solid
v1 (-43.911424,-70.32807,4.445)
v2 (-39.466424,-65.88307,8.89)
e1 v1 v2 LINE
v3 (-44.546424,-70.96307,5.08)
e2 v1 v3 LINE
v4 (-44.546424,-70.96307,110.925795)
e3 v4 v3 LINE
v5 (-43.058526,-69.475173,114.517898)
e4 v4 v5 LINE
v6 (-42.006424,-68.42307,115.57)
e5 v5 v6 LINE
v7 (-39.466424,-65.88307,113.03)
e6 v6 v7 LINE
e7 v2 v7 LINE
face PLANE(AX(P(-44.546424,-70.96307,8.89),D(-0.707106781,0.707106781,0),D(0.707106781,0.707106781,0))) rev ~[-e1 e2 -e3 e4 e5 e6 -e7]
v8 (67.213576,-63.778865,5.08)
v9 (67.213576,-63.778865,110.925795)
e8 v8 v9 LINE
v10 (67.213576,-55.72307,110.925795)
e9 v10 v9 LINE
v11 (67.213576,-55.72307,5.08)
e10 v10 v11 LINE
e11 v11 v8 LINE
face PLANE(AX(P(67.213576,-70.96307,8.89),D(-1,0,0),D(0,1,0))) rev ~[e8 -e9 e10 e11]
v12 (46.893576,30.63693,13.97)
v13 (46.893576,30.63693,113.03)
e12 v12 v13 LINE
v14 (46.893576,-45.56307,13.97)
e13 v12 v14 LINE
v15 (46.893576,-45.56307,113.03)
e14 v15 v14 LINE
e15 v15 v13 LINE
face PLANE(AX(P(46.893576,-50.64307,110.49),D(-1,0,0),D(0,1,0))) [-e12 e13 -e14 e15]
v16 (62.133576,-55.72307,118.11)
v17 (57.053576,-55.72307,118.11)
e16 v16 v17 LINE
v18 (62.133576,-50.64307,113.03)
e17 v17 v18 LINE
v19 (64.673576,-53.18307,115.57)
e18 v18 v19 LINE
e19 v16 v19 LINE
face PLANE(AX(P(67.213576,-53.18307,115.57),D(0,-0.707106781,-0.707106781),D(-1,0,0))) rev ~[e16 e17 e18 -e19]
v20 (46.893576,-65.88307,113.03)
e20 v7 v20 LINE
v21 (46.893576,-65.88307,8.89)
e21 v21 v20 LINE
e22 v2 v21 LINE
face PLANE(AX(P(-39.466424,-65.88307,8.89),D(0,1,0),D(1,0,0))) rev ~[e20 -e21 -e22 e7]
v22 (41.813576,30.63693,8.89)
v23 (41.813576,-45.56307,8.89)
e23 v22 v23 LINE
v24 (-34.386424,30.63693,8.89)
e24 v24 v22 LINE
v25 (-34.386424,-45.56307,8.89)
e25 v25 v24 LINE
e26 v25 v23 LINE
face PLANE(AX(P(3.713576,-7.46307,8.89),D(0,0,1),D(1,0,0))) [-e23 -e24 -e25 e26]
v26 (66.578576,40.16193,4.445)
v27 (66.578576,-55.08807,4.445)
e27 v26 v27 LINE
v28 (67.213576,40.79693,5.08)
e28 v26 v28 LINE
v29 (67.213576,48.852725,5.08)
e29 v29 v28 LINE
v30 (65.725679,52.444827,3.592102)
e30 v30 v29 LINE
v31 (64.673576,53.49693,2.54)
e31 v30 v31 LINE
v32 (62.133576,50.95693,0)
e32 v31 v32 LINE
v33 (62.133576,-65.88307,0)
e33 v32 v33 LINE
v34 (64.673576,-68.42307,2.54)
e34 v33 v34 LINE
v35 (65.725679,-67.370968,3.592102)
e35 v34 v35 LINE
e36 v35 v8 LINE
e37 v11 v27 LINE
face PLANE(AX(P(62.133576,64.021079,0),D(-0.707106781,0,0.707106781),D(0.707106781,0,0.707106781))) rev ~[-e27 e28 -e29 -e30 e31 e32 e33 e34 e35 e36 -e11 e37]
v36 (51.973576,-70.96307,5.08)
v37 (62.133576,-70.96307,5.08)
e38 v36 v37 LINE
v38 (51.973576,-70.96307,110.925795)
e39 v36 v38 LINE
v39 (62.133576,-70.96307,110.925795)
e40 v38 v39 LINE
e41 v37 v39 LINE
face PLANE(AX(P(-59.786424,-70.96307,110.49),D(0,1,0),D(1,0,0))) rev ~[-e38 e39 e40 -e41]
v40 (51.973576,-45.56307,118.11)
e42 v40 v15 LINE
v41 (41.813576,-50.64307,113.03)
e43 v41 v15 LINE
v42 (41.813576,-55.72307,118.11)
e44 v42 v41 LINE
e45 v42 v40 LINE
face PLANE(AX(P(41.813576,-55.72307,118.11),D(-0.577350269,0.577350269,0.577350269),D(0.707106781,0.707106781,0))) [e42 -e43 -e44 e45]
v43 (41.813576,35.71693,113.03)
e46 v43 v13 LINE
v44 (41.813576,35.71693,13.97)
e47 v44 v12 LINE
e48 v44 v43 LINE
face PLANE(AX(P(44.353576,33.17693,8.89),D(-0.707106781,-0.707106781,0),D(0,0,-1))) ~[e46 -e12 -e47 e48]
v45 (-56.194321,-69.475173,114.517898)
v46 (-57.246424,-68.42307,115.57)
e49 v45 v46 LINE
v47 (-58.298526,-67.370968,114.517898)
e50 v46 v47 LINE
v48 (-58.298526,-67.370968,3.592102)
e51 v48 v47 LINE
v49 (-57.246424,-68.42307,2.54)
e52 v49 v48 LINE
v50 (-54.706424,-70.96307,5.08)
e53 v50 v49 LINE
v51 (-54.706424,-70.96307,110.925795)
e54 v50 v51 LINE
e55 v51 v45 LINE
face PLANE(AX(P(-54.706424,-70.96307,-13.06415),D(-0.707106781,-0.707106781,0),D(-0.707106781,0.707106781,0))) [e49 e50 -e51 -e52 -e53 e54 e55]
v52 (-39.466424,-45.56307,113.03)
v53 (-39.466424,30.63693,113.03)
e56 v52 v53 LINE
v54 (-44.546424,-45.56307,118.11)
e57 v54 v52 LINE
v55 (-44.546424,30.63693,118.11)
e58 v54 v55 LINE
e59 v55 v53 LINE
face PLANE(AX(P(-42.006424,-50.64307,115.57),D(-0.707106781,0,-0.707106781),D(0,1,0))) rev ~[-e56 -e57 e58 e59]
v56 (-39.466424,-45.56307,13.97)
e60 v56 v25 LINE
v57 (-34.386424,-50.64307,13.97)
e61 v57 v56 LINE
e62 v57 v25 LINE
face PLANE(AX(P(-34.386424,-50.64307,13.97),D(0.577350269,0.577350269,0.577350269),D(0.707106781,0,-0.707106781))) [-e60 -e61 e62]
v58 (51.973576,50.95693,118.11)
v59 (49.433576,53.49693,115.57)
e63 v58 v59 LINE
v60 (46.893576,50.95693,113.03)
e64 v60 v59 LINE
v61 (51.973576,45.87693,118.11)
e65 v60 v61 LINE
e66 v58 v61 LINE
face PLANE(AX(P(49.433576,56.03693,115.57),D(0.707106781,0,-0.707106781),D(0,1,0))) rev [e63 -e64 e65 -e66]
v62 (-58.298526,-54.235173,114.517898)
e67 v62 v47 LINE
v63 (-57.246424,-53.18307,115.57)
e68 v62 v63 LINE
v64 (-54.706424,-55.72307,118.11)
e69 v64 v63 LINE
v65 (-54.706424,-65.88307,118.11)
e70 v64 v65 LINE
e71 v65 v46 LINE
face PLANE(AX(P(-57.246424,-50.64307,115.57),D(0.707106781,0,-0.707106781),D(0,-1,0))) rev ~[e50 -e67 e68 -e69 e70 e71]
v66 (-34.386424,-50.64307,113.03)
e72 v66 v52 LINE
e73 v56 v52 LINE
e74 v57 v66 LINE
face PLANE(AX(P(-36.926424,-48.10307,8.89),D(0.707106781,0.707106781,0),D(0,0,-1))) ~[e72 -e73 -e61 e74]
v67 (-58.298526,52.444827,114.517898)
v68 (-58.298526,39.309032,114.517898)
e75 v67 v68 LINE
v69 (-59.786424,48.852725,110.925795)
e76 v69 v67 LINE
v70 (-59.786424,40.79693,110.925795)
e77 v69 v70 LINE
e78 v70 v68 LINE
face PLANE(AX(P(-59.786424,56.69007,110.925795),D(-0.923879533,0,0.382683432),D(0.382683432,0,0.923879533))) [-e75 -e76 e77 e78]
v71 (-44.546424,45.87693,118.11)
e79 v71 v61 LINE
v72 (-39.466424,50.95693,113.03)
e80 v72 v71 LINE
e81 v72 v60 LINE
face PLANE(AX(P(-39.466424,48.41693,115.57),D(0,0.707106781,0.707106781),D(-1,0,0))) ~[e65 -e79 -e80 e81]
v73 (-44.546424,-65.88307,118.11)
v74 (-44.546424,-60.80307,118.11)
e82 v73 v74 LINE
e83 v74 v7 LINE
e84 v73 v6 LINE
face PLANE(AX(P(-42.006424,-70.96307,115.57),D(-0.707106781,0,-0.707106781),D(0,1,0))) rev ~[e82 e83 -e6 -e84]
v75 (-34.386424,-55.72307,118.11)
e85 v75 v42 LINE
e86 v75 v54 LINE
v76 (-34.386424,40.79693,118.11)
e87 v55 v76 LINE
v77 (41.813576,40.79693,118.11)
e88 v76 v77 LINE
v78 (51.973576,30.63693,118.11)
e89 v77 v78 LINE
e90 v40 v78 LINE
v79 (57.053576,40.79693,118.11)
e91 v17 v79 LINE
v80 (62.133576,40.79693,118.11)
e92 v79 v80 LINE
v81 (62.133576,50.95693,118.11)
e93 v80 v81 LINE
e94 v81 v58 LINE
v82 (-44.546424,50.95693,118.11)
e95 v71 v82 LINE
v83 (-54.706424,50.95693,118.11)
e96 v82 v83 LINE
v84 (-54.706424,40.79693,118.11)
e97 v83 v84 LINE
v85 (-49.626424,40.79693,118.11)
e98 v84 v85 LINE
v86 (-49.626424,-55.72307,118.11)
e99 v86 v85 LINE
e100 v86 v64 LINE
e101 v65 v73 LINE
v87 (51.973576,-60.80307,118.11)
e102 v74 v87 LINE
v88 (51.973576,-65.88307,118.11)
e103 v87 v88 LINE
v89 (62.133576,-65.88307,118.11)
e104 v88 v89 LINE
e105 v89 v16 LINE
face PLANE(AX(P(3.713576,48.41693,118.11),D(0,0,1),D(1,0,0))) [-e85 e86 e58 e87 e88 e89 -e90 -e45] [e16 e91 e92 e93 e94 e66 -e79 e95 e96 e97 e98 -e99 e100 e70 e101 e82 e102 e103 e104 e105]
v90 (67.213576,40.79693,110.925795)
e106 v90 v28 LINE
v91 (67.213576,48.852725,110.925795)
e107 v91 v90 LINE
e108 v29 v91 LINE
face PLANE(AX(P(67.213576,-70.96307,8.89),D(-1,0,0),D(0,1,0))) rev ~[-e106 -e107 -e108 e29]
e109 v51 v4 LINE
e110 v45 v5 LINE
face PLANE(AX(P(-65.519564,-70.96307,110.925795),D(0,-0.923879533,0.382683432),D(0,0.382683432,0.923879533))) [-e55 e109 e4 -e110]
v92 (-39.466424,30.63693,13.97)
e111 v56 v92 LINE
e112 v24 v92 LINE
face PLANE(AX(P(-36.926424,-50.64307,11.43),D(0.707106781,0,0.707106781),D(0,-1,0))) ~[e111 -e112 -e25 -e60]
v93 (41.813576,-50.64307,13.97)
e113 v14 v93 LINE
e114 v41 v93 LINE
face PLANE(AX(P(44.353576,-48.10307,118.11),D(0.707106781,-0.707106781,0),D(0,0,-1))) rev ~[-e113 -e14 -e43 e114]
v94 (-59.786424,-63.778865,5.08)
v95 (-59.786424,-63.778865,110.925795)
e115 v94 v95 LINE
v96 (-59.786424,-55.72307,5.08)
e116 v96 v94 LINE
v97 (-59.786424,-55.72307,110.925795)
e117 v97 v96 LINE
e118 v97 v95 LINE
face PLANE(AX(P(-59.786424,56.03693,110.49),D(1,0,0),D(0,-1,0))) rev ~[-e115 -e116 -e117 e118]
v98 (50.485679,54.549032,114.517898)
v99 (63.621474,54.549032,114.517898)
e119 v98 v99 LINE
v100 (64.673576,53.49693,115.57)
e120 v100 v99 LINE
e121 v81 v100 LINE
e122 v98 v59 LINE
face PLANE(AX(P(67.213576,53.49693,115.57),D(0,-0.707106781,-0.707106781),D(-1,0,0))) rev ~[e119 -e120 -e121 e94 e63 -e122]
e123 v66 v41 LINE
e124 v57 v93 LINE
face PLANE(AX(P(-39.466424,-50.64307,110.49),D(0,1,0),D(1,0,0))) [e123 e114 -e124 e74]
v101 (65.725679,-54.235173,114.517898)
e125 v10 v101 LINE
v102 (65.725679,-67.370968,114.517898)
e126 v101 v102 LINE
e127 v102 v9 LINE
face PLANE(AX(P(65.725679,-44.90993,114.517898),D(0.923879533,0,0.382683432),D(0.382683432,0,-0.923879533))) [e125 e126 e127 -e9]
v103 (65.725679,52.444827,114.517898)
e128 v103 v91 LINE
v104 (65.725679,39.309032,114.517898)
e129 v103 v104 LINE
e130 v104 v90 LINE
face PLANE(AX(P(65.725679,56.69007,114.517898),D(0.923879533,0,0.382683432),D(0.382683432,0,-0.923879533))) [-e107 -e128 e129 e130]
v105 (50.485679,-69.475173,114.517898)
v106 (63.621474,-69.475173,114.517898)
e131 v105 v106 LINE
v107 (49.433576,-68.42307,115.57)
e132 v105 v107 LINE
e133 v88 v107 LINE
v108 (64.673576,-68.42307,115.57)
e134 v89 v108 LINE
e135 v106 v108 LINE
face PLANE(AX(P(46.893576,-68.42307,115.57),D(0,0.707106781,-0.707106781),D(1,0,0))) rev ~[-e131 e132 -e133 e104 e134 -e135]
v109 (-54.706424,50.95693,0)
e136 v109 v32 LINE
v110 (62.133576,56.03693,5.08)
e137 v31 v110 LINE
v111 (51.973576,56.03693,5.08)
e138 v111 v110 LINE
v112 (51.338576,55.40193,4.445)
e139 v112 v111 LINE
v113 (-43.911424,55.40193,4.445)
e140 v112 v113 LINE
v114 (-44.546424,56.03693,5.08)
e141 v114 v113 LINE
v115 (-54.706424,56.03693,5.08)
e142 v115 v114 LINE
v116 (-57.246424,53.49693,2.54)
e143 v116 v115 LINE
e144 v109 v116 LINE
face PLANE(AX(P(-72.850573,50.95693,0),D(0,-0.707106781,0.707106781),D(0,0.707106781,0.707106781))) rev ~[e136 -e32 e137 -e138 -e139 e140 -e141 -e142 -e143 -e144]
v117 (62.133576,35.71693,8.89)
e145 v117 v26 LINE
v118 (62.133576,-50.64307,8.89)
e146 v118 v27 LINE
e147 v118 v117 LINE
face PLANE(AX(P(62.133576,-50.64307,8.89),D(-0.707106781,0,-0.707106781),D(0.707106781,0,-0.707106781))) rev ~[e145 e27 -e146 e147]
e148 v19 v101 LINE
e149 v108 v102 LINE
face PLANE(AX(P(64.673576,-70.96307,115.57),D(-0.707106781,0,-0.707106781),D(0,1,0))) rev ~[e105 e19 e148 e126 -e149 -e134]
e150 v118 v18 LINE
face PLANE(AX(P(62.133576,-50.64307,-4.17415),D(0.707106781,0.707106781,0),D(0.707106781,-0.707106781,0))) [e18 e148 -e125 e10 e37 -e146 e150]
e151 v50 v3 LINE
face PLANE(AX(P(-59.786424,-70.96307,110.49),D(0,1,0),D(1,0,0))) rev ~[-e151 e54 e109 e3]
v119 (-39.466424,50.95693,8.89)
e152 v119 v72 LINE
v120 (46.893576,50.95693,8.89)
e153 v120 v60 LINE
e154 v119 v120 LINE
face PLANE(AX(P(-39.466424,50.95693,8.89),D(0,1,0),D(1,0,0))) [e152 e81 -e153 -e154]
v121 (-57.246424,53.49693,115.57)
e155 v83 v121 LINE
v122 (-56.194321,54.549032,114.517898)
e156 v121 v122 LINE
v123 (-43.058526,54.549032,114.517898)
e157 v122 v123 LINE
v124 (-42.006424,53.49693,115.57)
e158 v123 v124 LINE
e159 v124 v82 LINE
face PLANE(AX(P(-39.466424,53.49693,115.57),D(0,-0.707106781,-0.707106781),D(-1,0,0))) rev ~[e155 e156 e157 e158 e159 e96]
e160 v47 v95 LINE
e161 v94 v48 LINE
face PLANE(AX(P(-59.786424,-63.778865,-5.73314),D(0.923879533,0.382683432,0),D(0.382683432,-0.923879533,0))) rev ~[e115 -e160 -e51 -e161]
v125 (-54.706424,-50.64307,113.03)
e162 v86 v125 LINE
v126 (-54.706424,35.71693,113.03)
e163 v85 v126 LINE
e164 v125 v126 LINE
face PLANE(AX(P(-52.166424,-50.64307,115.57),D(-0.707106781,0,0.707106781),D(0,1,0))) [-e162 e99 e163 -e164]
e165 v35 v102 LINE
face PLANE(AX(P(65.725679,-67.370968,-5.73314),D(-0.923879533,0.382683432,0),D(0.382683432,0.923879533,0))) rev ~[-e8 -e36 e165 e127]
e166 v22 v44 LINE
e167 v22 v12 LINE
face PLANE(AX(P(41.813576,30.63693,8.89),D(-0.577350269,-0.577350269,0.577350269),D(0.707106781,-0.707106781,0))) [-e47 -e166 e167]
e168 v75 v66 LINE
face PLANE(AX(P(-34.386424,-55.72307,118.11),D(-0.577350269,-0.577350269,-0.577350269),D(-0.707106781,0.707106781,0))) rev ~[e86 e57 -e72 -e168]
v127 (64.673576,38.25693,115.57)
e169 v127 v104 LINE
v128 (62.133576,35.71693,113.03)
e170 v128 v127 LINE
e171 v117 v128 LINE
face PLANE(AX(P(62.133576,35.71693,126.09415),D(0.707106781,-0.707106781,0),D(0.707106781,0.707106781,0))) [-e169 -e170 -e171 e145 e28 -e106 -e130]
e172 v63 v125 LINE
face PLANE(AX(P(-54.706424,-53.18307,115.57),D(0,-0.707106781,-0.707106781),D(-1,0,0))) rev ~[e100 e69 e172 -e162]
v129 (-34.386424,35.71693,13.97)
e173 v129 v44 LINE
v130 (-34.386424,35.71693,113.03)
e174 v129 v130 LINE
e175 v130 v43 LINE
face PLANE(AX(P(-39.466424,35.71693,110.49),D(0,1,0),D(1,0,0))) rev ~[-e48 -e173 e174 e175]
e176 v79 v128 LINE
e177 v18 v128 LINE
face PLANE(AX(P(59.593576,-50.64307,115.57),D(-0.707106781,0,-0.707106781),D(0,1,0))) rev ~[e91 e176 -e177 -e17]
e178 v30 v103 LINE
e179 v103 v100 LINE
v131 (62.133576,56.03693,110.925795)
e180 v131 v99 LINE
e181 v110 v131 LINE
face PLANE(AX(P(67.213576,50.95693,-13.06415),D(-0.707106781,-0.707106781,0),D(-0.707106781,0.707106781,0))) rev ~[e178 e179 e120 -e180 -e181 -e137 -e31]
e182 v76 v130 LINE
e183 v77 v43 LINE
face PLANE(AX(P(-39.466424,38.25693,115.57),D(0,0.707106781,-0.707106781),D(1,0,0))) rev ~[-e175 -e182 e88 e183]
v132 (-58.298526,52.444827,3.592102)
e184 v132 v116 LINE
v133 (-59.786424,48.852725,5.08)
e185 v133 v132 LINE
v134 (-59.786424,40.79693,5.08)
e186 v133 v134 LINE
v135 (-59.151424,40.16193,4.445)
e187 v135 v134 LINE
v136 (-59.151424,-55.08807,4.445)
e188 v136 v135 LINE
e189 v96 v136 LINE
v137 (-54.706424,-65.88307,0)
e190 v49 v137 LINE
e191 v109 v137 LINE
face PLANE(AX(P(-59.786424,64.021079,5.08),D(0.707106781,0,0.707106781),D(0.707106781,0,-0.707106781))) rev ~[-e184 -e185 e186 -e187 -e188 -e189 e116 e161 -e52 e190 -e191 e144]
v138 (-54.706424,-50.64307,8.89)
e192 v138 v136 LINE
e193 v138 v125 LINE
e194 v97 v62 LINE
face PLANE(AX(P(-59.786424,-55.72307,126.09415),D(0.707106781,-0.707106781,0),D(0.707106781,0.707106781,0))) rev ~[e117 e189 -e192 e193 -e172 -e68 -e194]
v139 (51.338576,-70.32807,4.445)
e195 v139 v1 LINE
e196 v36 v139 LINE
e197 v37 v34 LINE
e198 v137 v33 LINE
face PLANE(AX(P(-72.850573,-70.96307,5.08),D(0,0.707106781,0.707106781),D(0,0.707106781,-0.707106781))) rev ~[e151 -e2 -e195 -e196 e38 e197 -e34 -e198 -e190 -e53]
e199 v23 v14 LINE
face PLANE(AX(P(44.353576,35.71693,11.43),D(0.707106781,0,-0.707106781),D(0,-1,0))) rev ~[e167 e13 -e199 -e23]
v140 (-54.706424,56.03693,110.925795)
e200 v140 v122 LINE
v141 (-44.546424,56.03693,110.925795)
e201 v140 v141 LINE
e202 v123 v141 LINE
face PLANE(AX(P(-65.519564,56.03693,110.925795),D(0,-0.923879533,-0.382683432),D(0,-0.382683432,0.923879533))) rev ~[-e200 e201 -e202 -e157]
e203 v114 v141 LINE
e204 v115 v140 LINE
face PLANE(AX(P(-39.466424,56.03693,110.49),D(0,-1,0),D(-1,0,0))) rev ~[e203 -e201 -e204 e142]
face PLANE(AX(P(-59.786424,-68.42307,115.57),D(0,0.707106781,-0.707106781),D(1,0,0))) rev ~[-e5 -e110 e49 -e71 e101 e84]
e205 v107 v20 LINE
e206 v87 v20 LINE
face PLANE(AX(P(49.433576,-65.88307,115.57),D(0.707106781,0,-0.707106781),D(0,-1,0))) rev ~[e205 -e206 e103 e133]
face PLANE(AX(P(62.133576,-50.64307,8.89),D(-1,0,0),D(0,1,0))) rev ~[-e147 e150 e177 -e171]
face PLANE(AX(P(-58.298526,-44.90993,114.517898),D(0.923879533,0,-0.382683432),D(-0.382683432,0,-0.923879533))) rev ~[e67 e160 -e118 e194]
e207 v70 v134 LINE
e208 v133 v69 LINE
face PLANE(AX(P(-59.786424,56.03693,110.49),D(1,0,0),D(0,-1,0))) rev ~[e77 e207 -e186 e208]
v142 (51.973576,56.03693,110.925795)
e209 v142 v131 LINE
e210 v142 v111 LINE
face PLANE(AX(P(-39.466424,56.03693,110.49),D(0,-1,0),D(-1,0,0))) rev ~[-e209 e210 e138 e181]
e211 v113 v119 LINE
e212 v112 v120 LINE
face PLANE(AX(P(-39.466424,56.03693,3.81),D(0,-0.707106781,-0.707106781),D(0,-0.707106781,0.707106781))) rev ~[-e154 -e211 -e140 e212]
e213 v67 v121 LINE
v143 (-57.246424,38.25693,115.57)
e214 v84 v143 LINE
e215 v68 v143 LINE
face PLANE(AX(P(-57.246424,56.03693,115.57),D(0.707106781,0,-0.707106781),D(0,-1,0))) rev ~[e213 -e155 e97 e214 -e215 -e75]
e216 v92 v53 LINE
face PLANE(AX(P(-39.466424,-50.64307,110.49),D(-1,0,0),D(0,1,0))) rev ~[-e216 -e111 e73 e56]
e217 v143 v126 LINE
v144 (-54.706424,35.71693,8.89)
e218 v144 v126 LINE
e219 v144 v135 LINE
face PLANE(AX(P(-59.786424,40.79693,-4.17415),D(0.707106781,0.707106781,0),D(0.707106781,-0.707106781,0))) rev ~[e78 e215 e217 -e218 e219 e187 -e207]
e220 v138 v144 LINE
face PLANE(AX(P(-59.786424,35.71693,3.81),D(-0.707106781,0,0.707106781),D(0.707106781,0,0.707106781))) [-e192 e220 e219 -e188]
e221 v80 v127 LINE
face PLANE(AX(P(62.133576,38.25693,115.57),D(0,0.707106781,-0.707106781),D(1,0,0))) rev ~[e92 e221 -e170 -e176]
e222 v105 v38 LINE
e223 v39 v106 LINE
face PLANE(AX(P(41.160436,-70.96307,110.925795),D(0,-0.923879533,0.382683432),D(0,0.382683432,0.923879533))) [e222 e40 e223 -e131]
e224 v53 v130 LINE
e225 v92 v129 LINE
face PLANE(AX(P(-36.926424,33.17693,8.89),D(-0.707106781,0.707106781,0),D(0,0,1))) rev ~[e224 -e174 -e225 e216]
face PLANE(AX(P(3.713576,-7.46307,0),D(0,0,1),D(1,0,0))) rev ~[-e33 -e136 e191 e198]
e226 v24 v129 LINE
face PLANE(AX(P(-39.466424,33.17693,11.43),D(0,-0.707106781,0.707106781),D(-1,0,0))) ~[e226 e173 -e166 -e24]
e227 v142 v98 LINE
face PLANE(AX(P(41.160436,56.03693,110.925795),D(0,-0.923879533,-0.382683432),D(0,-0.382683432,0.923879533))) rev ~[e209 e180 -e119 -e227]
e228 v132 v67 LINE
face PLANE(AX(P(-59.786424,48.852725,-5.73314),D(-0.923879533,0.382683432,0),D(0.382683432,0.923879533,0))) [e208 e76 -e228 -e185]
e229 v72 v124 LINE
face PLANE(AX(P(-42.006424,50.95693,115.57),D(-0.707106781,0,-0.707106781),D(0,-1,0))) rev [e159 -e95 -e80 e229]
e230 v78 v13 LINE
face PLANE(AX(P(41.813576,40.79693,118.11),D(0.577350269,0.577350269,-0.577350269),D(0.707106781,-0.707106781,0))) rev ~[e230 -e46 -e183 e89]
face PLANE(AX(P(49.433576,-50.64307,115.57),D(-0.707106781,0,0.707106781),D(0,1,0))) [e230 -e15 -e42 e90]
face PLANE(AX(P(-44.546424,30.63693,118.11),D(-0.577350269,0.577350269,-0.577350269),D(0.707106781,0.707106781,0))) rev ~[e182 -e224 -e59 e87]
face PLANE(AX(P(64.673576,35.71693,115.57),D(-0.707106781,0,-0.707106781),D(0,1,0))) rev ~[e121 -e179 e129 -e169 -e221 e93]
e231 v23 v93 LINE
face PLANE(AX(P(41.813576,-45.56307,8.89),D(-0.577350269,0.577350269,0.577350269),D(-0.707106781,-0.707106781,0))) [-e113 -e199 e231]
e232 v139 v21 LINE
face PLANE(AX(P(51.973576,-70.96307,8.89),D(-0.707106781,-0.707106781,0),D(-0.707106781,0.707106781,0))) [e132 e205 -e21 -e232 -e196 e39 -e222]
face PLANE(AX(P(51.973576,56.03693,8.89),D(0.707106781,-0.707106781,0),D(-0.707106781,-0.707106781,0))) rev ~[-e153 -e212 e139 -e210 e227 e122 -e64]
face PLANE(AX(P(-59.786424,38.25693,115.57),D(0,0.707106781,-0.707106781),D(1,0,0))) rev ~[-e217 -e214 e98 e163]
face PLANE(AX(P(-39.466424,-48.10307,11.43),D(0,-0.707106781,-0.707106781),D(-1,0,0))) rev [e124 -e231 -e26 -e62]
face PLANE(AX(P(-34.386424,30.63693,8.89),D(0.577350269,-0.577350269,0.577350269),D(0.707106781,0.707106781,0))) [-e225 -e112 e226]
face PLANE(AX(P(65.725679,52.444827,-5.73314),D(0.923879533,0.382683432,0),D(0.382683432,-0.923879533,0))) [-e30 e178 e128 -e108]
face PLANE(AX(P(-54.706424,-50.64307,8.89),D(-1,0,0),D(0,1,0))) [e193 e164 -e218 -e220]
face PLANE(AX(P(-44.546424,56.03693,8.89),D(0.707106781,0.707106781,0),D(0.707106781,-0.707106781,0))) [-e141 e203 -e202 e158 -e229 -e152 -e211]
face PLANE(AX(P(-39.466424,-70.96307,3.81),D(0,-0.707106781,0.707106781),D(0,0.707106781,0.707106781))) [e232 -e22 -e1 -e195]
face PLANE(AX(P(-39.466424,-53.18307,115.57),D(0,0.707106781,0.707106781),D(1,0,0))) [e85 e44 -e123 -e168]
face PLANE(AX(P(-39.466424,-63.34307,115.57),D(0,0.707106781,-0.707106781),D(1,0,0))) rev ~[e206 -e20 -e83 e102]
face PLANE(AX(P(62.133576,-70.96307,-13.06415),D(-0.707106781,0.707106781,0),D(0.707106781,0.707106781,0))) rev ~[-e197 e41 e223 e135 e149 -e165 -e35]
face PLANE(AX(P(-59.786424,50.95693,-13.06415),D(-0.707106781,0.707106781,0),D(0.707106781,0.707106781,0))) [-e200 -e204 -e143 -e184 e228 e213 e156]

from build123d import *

# Parameters (mm, degrees)
F0_W          = 127
F0_H          = 127
F1_DEPTH      = 8.89
F2_W          = 86.36
F2_H          = 10.16
F2_W_2        = 10.16
F2_H_2        = 86.36
F3_DEPTH      = 101.6
F4_W          = 10.0171214116
F4_H          = 10.0171214116
F4_W_2        = 96.3771214116
F4_H_2        = 96.3771214116
F4_W_3        = 86.36
F4_H_3        = 86.36
F5_DEPTH      = 7.62
F6_W          = 86.36
F6_H          = 5.08
F9_W          = 5.08
F9_H          = 86.36
F7_W          = 5.08
F7_H          = 86.36
F8_W          = 86.36
F8_H          = 5.08
F10_DEPTH     = 109.22
F11_SIZE      = 5.08
F12_T1_DEPTH  = 139.1582991577
F12_T3_DEPTH  = 31.7862799398
F12_T5_DEPTH  = 153.1282991577
F12_T7_DEPTH  = 117.2041495789
F12_T9_DEPTH  = 86.36
F12_T11_DEPTH = 31.7862799398
F12_T17_DEPTH = 130.2682991577
F12_T22_DEPTH = 99.4241495789
F12_T29_DEPTH = 99.4241495789
F12_T33_DEPTH = 130.2682991577
F12_T41_DEPTH = 130.2682991577
F12_T46_DEPTH = 99.4241495789
F12_T53_DEPTH = 99.4241495789
F12_T57_DEPTH = 130.2682991577
F13_T1_DEPTH  = 124.4962799399
F13_T3_DEPTH  = 142.9682991577
F13_T5_DEPTH  = 26.7062799397
F13_T7_DEPTH  = 117.2041495789
F13_T9_DEPTH  = 86.36
F13_T11_DEPTH = 26.7062799398
F13_T17_DEPTH = 130.2682991577
F13_T22_DEPTH = 99.4241495789
F13_T29_DEPTH = 99.4241495789
F13_T33_DEPTH = 130.2682991577
F13_T41_DEPTH = 130.2682991577
F13_T46_DEPTH = 99.4241495789
F13_T53_DEPTH = 99.4241495789
F13_T57_DEPTH = 130.2682991577


# Not quite as in the source:
# - a fillet or chamfer that OpenCascade refuses, or shapes differently, is made with other operations: its cross-section is extruded or revolved along the edge and cut away or added


with BuildPart() as f1:
    # F0 (on Top) → F1 (new body)
    with BuildSketch(Plane.XY):
        with Locations((3.7135761231, -7.4630701935)):
            Rectangle(F0_W, F0_H)
    extrude(amount=F1_DEPTH)

    # F2 (on face) → F3 (join)
    with BuildSketch(Plane.XY.offset(8.89)):
        Polygon((-59.7864238769, 56.0369298065), (-59.7864238769, 35.7169298065), (-49.6264238769, 35.7169298065), (-39.4664238769, 35.7169298065), (-39.4664238769, 45.8769298065), (-39.4664238769, 56.0369298065), align=None)
        with Locations((3.7135761231, 40.7969298065)):
            Rectangle(F2_W, F2_H)
        Polygon((46.8935761231, 45.8769298065), (46.8935761231, 35.7169298065), (57.0535761231, 35.7169298065), (67.2135761231, 35.7169298065), (67.2135761231, 56.0369298065), (46.8935761231, 56.0369298065), align=None)
        with Locations((51.9735761231, -7.4630701935)):
            Rectangle(F2_W_2, F2_H_2)
        with Locations((-44.5464238769, -7.4630701935)):
            Rectangle(F2_W_2, F2_H_2)
        Polygon((-59.7864238769, -50.6430701935), (-59.7864238769, -70.9630701935), (-39.4664238769, -70.9630701935), (-39.4664238769, -60.8030701935), (-39.4664238769, -50.6430701935), (-49.6264238769, -50.6430701935), align=None)
        Polygon((46.8935761231, -60.8030701935), (46.8935761231, -70.9630701935), (67.2135761231, -70.9630701935), (67.2135761231, -50.6430701935), (57.0535761231, -50.6430701935), (46.8935761231, -50.6430701935), align=None)
        with Locations((3.7135761231, -55.7230701935)):
            Rectangle(F2_W, F2_H)
    extrude(amount=F3_DEPTH)

    # F4 (on face) → F5 (join)
    with BuildSketch(Plane.XY.offset(110.49)):
        Polygon((-39.4664238769, 56.0369298065), (-59.7864238769, 56.0369298065), (-59.7864238769, 35.7169298065), (-49.6264238769, 35.7169298065), (-49.6264238769, -50.6430701935), (-59.7864238769, -50.6430701935), (-59.7864238769, -70.9630701935), (-39.4664238769, -70.9630701935), (-39.4664238769, -60.8030701935), (46.8935761231, -60.8030701935), (46.8935761231, -70.9630701935), (67.2135761231, -70.9630701935), (67.2135761231, -50.6430701935), (57.0535761231, -50.6430701935), (57.0535761231, 35.7169298065), (67.2135761231, 35.7169298065), (67.2135761231, 56.0369298065), (46.8935761231, 56.0369298065), (46.8935761231, 45.8769298065), (-39.4664238769, 45.8769298065), align=None)
        with Locations((-49.6264238769, -60.8030701935)):
            Rectangle(F4_W, F4_H, mode=Mode.SUBTRACT)
        with Locations((57.0535761231, -60.8030701935)):
            Rectangle(F4_W, F4_H, mode=Mode.SUBTRACT)
        with Locations((-49.6264238769, 45.8769298065)):
            Rectangle(F4_W, F4_H, mode=Mode.SUBTRACT)
        with Locations((3.7135761231, -7.4630701935)):
            Rectangle(F4_W_2, F4_H_2, mode=Mode.SUBTRACT)
        with Locations((57.0535761231, 45.8769298065)):
            Rectangle(F4_W, F4_H, mode=Mode.SUBTRACT)
        with Locations((3.7135761231, -7.4630701935)):
            Rectangle(F4_W_2, F4_H_2)
        with Locations((3.7135761231, -7.4630701935)):
            Rectangle(F4_W_3, F4_H_3, mode=Mode.SUBTRACT)
        with Locations((-49.6264238769, 45.8769298065)):
            Rectangle(F4_W, F4_H)
        with Locations((57.0535761231, 45.8769298065)):
            Rectangle(F4_W, F4_H)
        with Locations((-49.6264238769, -60.8030701935)):
            Rectangle(F4_W, F4_H)
        with Locations((57.0535761231, -60.8030701935)):
            Rectangle(F4_W, F4_H)
    extrude(amount=F5_DEPTH)

    # F6 (on face) + F9 (on face) + F7 (on face) + F8 (on face) → F10 (join)
    with BuildSketch(Plane.XY.offset(8.89)):
        with Locations((3.7135761231, 48.4169298065)):
            Rectangle(F6_W, F6_H)
    with BuildSketch(Plane.XY.offset(8.89)):
        with Locations((-52.1664238769, -7.4630701935)):
            Rectangle(F9_W, F9_H)
    with BuildSketch(Plane.XY.offset(8.89)):
        with Locations((59.5935761231, -7.4630701935)):
            Rectangle(F7_W, F7_H)
    with BuildSketch(Plane.XY.offset(8.89)):
        with Locations((3.7135761231, -63.3430701935)):
            Rectangle(F8_W, F8_H)
    extrude(amount=F10_DEPTH)

    # F11
    f11_edges = [f1.edges().sort_by_distance(p)[0] for p in [
        (3.713576, -50.64307, 118.11),
        (-39.466424, -7.46307, 118.11),
        (3.713576, 35.71693, 118.11),
        (46.893576, -7.46307, 118.11),
        (67.213576, 45.87693, 118.11),
        (57.053576, 56.03693, 118.11),
        (46.893576, 53.49693, 118.11),
        (3.713576, 50.95693, 118.11),
        (-39.466424, 53.49693, 118.11),
        (-49.626424, 56.03693, 118.11),
        (-59.786424, 45.87693, 118.11),
        (-57.246424, 35.71693, 118.11),
        (-54.706424, -7.46307, 118.11),
        (-57.246424, -50.64307, 118.11),
        (-59.786424, -60.80307, 118.11),
        (-49.626424, -70.96307, 118.11),
        (-39.466424, -68.42307, 118.11),
        (3.713576, -65.88307, 118.11),
        (46.893576, -68.42307, 118.11),
        (57.053576, -70.96307, 118.11),
        (67.213576, -60.80307, 118.11),
        (64.673576, -50.64307, 118.11),
        (62.133576, -7.46307, 118.11),
        (64.673576, 35.71693, 118.11),
        (-39.466424, 35.71693, 63.5),
        (-39.466424, -7.46307, 8.89),
        (-39.466424, -50.64307, 63.5),
        (46.893576, 35.71693, 63.5),
        (3.713576, 35.71693, 8.89),
        (46.893576, -50.64307, 63.5),
        (46.893576, -7.46307, 8.89),
        (3.713576, -50.64307, 8.89),
    ]]
    chamfer(f11_edges, length=F11_SIZE)

    # F12: chamfer of 5.08 on 16 edges, made by hand

    # F12_s2 → F12_t1 (cut)
    with BuildSketch(Plane.XY.offset(-13.0641495789)):
        Polygon((67.2135761231, 50.9569298065), (62.1335761231, 56.0369298065), (67.2135761231, 56.0369298065), align=None)
        Polygon((-59.7864238769, 50.9569298065), (-54.7064238769, 56.0369298065), (-59.7864238769, 56.0369298065), align=None)
        Polygon((-54.7064238769, -70.9630701935), (-59.7864238769, -65.8830701935), (-59.7864238769, -70.9630701935), align=None)
        Polygon((62.1335761231, -70.9630701935), (67.2135761231, -65.8830701935), (67.2135761231, -70.9630701935), align=None)
    extrude(amount=F12_T1_DEPTH, mode=Mode.SUBTRACT)

    # F12_s4 → F12_t3 (cut)
    with BuildSketch(Plane.YZ.offset(41.1604361532)):
        Polygon((56.0369298065, 110.9257951031), (54.5490322549, 114.5178975516), (56.0369298065, 113.03), align=None)
        Polygon((-70.9630701935, 110.9257951031), (-69.4751726419, 114.5178975516), (-70.9630701935, 113.03), align=None)
    extrude(amount=F12_T3_DEPTH, mode=Mode.SUBTRACT)

    # F12_s6 → F12_t5 (cut)
    with BuildSketch(Plane.YZ.offset(-72.8505734557)):
        Polygon((50.9569298065, 0), (56.0369298065, 5.08), (56.0369298065, 0), align=None)
        Polygon((-70.9630701935, 5.08), (-65.8830701935, 0), (-70.9630701935, 0), align=None)
    extrude(amount=F12_T5_DEPTH, mode=Mode.SUBTRACT)

    # F12_s8 → F12_t7 (cut)
    with BuildSketch(Plane.XY.offset(8.89)):
        Polygon((51.9735761231, 56.0369298065), (46.8935761231, 50.9569298065), (46.8935761231, 56.0369298065), align=None)
        Polygon((-44.5464238769, 56.0369298065), (-39.4664238769, 50.9569298065), (-39.4664238769, 56.0369298065), align=None)
        Polygon((-44.5464238769, -70.9630701935), (-39.4664238769, -65.8830701935), (-39.4664238769, -70.9630701935), align=None)
        Polygon((51.9735761231, -70.9630701935), (46.8935761231, -65.8830701935), (46.8935761231, -70.9630701935), align=None)
    extrude(amount=F12_T7_DEPTH, mode=Mode.SUBTRACT)

    # F12_s10 → F12_t9 (cut)
    with BuildSketch(Plane.YZ.offset(-39.4664238769)):
        Polygon((56.0369298065, 3.81), (50.9569298065, 8.89), (56.0369298065, 8.89), align=None)
        Polygon((-70.9630701935, 3.81), (-65.8830701935, 8.89), (-70.9630701935, 8.89), align=None)
    extrude(amount=F12_T9_DEPTH, mode=Mode.SUBTRACT)

    # F12_s12 → F12_t11 (cut)
    with BuildSketch(Plane.YZ.offset(-65.5195638468)):
        Polygon((56.0369298065, 110.9257951031), (54.5490322549, 114.5178975516), (56.0369298065, 113.03), align=None)
        Polygon((-70.9630701935, 110.9257951031), (-69.4751726419, 114.5178975516), (-70.9630701935, 113.03), align=None)
    extrude(amount=F12_T11_DEPTH, mode=Mode.SUBTRACT)


with BuildPart() as f12_tool15:
    # F12_s16 → F12_t17 (new body)
    with BuildSketch(Plane.XY.offset(-4.1741495789)):
        Polygon((51.9735761231, 56.0369298065), (46.8935761231, 50.9569298065), (46.8935761231, 56.0369298065), align=None)
    extrude(amount=F12_T17_DEPTH)

    split(bisect_by=Plane.XY, keep=Keep.TOP)

    split(bisect_by=Plane.XY.offset(8.89), keep=Keep.BOTTOM)


with BuildPart() as f12_tool20:
    # F12_s21 → F12_t22 (new body)
    with BuildSketch(Plane.YZ.offset(59.957725702)):
        Polygon((56.0369298065, 3.81), (50.9569298065, 8.89), (56.0369298065, 8.89), align=None)
    extrude(amount=-F12_T22_DEPTH)

    split(bisect_by=Plane.YZ.offset(46.8935761231), keep=Keep.TOP)


with BuildPart() as f12_tool15_1:
    add(f12_tool15.part)

    # F12_t24: intersect F12_tool20
    add(f12_tool20.part, mode=Mode.INTERSECT)


with BuildPart() as f1_1:
    add(f1.part)

    # F12_t13: cut F12_tool15
    add(f12_tool15_1.part, mode=Mode.SUBTRACT)


with BuildPart() as f12_tool27:
    # F12_s28 → F12_t29 (new body)
    with BuildSketch(Plane.YZ.offset(46.8935761231)):
        Polygon((56.0369298065, 3.81), (50.9569298065, 8.89), (56.0369298065, 8.89), align=None)
    extrude(amount=-F12_T29_DEPTH)

    split(bisect_by=Plane.YZ.offset(-39.4664238769), keep=Keep.BOTTOM)


with BuildPart() as f12_tool31:
    # F12_s32 → F12_t33 (new body)
    with BuildSketch(Plane.XY.offset(126.0941495789)):
        Polygon((-44.5464238769, 56.0369298065), (-39.4664238769, 50.9569298065), (-39.4664238769, 56.0369298065), align=None)
    extrude(amount=-F12_T33_DEPTH)

    split(bisect_by=Plane.XY, keep=Keep.TOP)

    split(bisect_by=Plane.XY.offset(8.89), keep=Keep.BOTTOM)


with BuildPart() as f12_tool27_1:
    add(f12_tool27.part)

    # F12_t36: intersect F12_tool31
    add(f12_tool31.part, mode=Mode.INTERSECT)


with BuildPart() as f1_2:
    add(f1_1.part)

    # F12_t25: cut F12_tool27
    add(f12_tool27_1.part, mode=Mode.SUBTRACT)


with BuildPart() as f12_tool39:
    # F12_s40 → F12_t41 (new body)
    with BuildSketch(Plane.XY.offset(-4.1741495789)):
        Polygon((-44.5464238769, -70.9630701935), (-39.4664238769, -65.8830701935), (-39.4664238769, -70.9630701935), align=None)
    extrude(amount=F12_T41_DEPTH)

    split(bisect_by=Plane.XY, keep=Keep.TOP)

    split(bisect_by=Plane.XY.offset(8.89), keep=Keep.BOTTOM)


with BuildPart() as f12_tool44:
    # F12_s45 → F12_t46 (new body)
    with BuildSketch(Plane.YZ.offset(-52.5305734557)):
        Polygon((-70.9630701935, 3.81), (-65.8830701935, 8.89), (-70.9630701935, 8.89), align=None)
    extrude(amount=F12_T46_DEPTH)

    split(bisect_by=Plane.YZ.offset(-39.4664238769), keep=Keep.BOTTOM)


with BuildPart() as f12_tool39_1:
    add(f12_tool39.part)

    # F12_t48: intersect F12_tool44
    add(f12_tool44.part, mode=Mode.INTERSECT)


with BuildPart() as f1_3:
    add(f1_2.part)

    # F12_t37: cut F12_tool39
    add(f12_tool39_1.part, mode=Mode.SUBTRACT)


with BuildPart() as f12_tool51:
    # F12_s52 → F12_t53 (new body)
    with BuildSketch(Plane.YZ.offset(-39.4664238769)):
        Polygon((-70.9630701935, 3.81), (-65.8830701935, 8.89), (-70.9630701935, 8.89), align=None)
    extrude(amount=F12_T53_DEPTH)

    split(bisect_by=Plane.YZ.offset(46.8935761231), keep=Keep.TOP)


with BuildPart() as f12_tool55:
    # F12_s56 → F12_t57 (new body)
    with BuildSketch(Plane.XY.offset(126.0941495789)):
        Polygon((51.9735761231, -70.9630701935), (46.8935761231, -65.8830701935), (46.8935761231, -70.9630701935), align=None)
    extrude(amount=-F12_T57_DEPTH)

    split(bisect_by=Plane.XY, keep=Keep.TOP)

    split(bisect_by=Plane.XY.offset(8.89), keep=Keep.BOTTOM)


with BuildPart() as f12_tool51_1:
    add(f12_tool51.part)

    # F12_t60: intersect F12_tool55
    add(f12_tool55.part, mode=Mode.INTERSECT)


with BuildPart() as f1_4:
    add(f1_3.part)

    # F12_t49: cut F12_tool51
    add(f12_tool51_1.part, mode=Mode.SUBTRACT)

    # F13: chamfer of 5.08 on 16 edges, made by hand

    # F13_s2 → F13_t1 (cut)
    with BuildSketch(Plane.XY.offset(-5.7331399699)):
        Polygon((-59.7864238769, 48.8527249097), (-58.2985263253, 52.4448273581), (-59.7864238769, 50.9569298065), align=None)
        Polygon((-59.7864238769, -63.7788652967), (-58.2985263253, -67.3709677451), (-59.7864238769, -65.8830701935), align=None)
        Polygon((65.7256785715, -67.3709677451), (67.2135761231, -63.7788652966), (67.2135761231, -65.8830701935), align=None)
        Polygon((65.7256785715, 52.4448273581), (67.2135761231, 48.8527249096), (67.2135761231, 50.9569298065), align=None)
    extrude(amount=F13_T1_DEPTH, mode=Mode.SUBTRACT)

    # F13_s4 → F13_t3 (cut)
    with BuildSketch(Plane.XZ.offset(-64.0210793854)):
        Polygon((-59.7864238769, 5.08), (-54.7064238769, 0), (-59.7864238769, 0), align=None)
        Polygon((62.1335761231, 0), (67.2135761231, 5.08), (67.2135761231, 0), align=None)
    extrude(amount=F13_T3_DEPTH, mode=Mode.SUBTRACT)

    # F13_s6 → F13_t5 (cut)
    with BuildSketch(Plane.XZ.offset(44.9099302236)):
        Polygon((-58.2985263253, 114.5178975516), (-59.7864238769, 110.9257951031), (-59.7864238769, 113.03), align=None)
        Polygon((65.7256785715, 114.5178975516), (67.2135761231, 110.9257951031), (67.2135761231, 113.03), align=None)
    extrude(amount=F13_T5_DEPTH, mode=Mode.SUBTRACT)

    # F13_s8 → F13_t7 (cut)
    with BuildSketch(Plane.XY.offset(8.89)):
        Polygon((-59.7864238769, -55.7230701935), (-54.7064238769, -50.6430701935), (-59.7864238769, -50.6430701935), align=None)
        Polygon((-59.7864238769, 40.7969298065), (-54.7064238769, 35.7169298065), (-59.7864238769, 35.7169298065), align=None)
        Polygon((62.1335761231, 35.7169298065), (67.2135761231, 40.7969298065), (67.2135761231, 35.7169298065), align=None)
        Polygon((62.1335761231, -50.6430701935), (67.2135761231, -55.7230701935), (67.2135761231, -50.6430701935), align=None)
    extrude(amount=F13_T7_DEPTH, mode=Mode.SUBTRACT)

    # F13_s10 → F13_t9 (cut)
    with BuildSketch(Plane.XZ.offset(-35.7169298065)):
        Polygon((-59.7864238769, 3.81), (-54.7064238769, 8.89), (-59.7864238769, 8.89), align=None)
        Polygon((62.1335761231, 8.89), (67.2135761231, 3.81), (67.2135761231, 8.89), align=None)
    extrude(amount=F13_T9_DEPTH, mode=Mode.SUBTRACT)

    # F13_s12 → F13_t11 (cut)
    with BuildSketch(Plane.XZ.offset(-56.6900697764)):
        Polygon((-59.7864238769, 110.9257951031), (-58.2985263253, 114.5178975516), (-59.7864238769, 113.03), align=None)
        Polygon((65.7256785715, 114.5178975516), (67.2135761231, 110.9257951031), (67.2135761231, 113.03), align=None)
    extrude(amount=F13_T11_DEPTH, mode=Mode.SUBTRACT)


with BuildPart() as f13_tool15:
    # F13_s16 → F13_t17 (new body)
    with BuildSketch(Plane.XY.offset(126.0941495789)):
        Polygon((-59.7864238769, -55.7230701935), (-54.7064238769, -50.6430701935), (-59.7864238769, -50.6430701935), align=None)
    extrude(amount=-F13_T17_DEPTH)

    split(bisect_by=Plane.XY.offset(8.89), keep=Keep.BOTTOM)

    split(bisect_by=Plane.XY, keep=Keep.TOP)


with BuildPart() as f13_tool20:
    # F13_s21 → F13_t22 (new body)
    with BuildSketch(Plane.XZ.offset(-35.7169298065)):
        Polygon((-59.7864238769, 3.81), (-54.7064238769, 8.89), (-59.7864238769, 8.89), align=None)
    extrude(amount=F13_T22_DEPTH)

    split(bisect_by=Plane.XZ.offset(50.6430701935), keep=Keep.TOP)


with BuildPart() as f13_tool15_1:
    add(f13_tool15.part)

    # F13_t24: intersect F13_tool20
    add(f13_tool20.part, mode=Mode.INTERSECT)


with BuildPart() as f1_5:
    add(f1_4.part)

    # F13_t13: cut F13_tool15
    add(f13_tool15_1.part, mode=Mode.SUBTRACT)


with BuildPart() as f13_tool27:
    # F13_s28 → F13_t29 (new body)
    with BuildSketch(Plane.XZ.offset(-48.7810793854)):
        Polygon((-59.7864238769, 3.81), (-54.7064238769, 8.89), (-59.7864238769, 8.89), align=None)
    extrude(amount=F13_T29_DEPTH)

    split(bisect_by=Plane.XZ.offset(-35.7169298065), keep=Keep.BOTTOM)


with BuildPart() as f13_tool31:
    # F13_s32 → F13_t33 (new body)
    with BuildSketch(Plane.XY.offset(-4.1741495789)):
        Polygon((-59.7864238769, 40.7969298065), (-54.7064238769, 35.7169298065), (-59.7864238769, 35.7169298065), align=None)
    extrude(amount=F13_T33_DEPTH)

    split(bisect_by=Plane.XY.offset(8.89), keep=Keep.BOTTOM)

    split(bisect_by=Plane.XY, keep=Keep.TOP)


with BuildPart() as f13_tool27_1:
    add(f13_tool27.part)

    # F13_t36: intersect F13_tool31
    add(f13_tool31.part, mode=Mode.INTERSECT)


with BuildPart() as f1_6:
    add(f1_5.part)

    # F13_t25: cut F13_tool27
    add(f13_tool27_1.part, mode=Mode.SUBTRACT)


with BuildPart() as f13_tool39:
    # F13_s40 → F13_t41 (new body)
    with BuildSketch(Plane.XY.offset(126.0941495789)):
        Polygon((62.1335761231, 35.7169298065), (67.2135761231, 40.7969298065), (67.2135761231, 35.7169298065), align=None)
    extrude(amount=-F13_T41_DEPTH)

    split(bisect_by=Plane.XY, keep=Keep.TOP)

    split(bisect_by=Plane.XY.offset(8.89), keep=Keep.BOTTOM)


with BuildPart() as f13_tool44:
    # F13_s45 → F13_t46 (new body)
    with BuildSketch(Plane.XZ.offset(50.6430701935)):
        Polygon((62.1335761231, 8.89), (67.2135761231, 3.81), (67.2135761231, 8.89), align=None)
    extrude(amount=-F13_T46_DEPTH)

    split(bisect_by=Plane.XZ.offset(-35.7169298065), keep=Keep.BOTTOM)


with BuildPart() as f13_tool39_1:
    add(f13_tool39.part)

    # F13_t48: intersect F13_tool44
    add(f13_tool44.part, mode=Mode.INTERSECT)


with BuildPart() as f1_7:
    add(f1_6.part)

    # F13_t37: cut F13_tool39
    add(f13_tool39_1.part, mode=Mode.SUBTRACT)


with BuildPart() as f13_tool51:
    # F13_s52 → F13_t53 (new body)
    with BuildSketch(Plane.XZ.offset(63.7072197724)):
        Polygon((62.1335761231, 8.89), (67.2135761231, 3.81), (67.2135761231, 8.89), align=None)
    extrude(amount=-F13_T53_DEPTH)

    split(bisect_by=Plane.XZ.offset(50.6430701935), keep=Keep.TOP)


with BuildPart() as f13_tool55:
    # F13_s56 → F13_t57 (new body)
    with BuildSketch(Plane.XY.offset(-4.1741495789)):
        Polygon((62.1335761231, -50.6430701935), (67.2135761231, -55.7230701935), (67.2135761231, -50.6430701935), align=None)
    extrude(amount=F13_T57_DEPTH)

    split(bisect_by=Plane.XY, keep=Keep.TOP)

    split(bisect_by=Plane.XY.offset(8.89), keep=Keep.BOTTOM)


with BuildPart() as f13_tool51_1:
    add(f13_tool51.part)

    # F13_t60: intersect F13_tool55
    add(f13_tool55.part, mode=Mode.INTERSECT)


with BuildPart() as f1_8:
    add(f1_7.part)

    # F13_t49: cut F13_tool51
    add(f13_tool51_1.part, mode=Mode.SUBTRACT)


solid = f1_8.part
